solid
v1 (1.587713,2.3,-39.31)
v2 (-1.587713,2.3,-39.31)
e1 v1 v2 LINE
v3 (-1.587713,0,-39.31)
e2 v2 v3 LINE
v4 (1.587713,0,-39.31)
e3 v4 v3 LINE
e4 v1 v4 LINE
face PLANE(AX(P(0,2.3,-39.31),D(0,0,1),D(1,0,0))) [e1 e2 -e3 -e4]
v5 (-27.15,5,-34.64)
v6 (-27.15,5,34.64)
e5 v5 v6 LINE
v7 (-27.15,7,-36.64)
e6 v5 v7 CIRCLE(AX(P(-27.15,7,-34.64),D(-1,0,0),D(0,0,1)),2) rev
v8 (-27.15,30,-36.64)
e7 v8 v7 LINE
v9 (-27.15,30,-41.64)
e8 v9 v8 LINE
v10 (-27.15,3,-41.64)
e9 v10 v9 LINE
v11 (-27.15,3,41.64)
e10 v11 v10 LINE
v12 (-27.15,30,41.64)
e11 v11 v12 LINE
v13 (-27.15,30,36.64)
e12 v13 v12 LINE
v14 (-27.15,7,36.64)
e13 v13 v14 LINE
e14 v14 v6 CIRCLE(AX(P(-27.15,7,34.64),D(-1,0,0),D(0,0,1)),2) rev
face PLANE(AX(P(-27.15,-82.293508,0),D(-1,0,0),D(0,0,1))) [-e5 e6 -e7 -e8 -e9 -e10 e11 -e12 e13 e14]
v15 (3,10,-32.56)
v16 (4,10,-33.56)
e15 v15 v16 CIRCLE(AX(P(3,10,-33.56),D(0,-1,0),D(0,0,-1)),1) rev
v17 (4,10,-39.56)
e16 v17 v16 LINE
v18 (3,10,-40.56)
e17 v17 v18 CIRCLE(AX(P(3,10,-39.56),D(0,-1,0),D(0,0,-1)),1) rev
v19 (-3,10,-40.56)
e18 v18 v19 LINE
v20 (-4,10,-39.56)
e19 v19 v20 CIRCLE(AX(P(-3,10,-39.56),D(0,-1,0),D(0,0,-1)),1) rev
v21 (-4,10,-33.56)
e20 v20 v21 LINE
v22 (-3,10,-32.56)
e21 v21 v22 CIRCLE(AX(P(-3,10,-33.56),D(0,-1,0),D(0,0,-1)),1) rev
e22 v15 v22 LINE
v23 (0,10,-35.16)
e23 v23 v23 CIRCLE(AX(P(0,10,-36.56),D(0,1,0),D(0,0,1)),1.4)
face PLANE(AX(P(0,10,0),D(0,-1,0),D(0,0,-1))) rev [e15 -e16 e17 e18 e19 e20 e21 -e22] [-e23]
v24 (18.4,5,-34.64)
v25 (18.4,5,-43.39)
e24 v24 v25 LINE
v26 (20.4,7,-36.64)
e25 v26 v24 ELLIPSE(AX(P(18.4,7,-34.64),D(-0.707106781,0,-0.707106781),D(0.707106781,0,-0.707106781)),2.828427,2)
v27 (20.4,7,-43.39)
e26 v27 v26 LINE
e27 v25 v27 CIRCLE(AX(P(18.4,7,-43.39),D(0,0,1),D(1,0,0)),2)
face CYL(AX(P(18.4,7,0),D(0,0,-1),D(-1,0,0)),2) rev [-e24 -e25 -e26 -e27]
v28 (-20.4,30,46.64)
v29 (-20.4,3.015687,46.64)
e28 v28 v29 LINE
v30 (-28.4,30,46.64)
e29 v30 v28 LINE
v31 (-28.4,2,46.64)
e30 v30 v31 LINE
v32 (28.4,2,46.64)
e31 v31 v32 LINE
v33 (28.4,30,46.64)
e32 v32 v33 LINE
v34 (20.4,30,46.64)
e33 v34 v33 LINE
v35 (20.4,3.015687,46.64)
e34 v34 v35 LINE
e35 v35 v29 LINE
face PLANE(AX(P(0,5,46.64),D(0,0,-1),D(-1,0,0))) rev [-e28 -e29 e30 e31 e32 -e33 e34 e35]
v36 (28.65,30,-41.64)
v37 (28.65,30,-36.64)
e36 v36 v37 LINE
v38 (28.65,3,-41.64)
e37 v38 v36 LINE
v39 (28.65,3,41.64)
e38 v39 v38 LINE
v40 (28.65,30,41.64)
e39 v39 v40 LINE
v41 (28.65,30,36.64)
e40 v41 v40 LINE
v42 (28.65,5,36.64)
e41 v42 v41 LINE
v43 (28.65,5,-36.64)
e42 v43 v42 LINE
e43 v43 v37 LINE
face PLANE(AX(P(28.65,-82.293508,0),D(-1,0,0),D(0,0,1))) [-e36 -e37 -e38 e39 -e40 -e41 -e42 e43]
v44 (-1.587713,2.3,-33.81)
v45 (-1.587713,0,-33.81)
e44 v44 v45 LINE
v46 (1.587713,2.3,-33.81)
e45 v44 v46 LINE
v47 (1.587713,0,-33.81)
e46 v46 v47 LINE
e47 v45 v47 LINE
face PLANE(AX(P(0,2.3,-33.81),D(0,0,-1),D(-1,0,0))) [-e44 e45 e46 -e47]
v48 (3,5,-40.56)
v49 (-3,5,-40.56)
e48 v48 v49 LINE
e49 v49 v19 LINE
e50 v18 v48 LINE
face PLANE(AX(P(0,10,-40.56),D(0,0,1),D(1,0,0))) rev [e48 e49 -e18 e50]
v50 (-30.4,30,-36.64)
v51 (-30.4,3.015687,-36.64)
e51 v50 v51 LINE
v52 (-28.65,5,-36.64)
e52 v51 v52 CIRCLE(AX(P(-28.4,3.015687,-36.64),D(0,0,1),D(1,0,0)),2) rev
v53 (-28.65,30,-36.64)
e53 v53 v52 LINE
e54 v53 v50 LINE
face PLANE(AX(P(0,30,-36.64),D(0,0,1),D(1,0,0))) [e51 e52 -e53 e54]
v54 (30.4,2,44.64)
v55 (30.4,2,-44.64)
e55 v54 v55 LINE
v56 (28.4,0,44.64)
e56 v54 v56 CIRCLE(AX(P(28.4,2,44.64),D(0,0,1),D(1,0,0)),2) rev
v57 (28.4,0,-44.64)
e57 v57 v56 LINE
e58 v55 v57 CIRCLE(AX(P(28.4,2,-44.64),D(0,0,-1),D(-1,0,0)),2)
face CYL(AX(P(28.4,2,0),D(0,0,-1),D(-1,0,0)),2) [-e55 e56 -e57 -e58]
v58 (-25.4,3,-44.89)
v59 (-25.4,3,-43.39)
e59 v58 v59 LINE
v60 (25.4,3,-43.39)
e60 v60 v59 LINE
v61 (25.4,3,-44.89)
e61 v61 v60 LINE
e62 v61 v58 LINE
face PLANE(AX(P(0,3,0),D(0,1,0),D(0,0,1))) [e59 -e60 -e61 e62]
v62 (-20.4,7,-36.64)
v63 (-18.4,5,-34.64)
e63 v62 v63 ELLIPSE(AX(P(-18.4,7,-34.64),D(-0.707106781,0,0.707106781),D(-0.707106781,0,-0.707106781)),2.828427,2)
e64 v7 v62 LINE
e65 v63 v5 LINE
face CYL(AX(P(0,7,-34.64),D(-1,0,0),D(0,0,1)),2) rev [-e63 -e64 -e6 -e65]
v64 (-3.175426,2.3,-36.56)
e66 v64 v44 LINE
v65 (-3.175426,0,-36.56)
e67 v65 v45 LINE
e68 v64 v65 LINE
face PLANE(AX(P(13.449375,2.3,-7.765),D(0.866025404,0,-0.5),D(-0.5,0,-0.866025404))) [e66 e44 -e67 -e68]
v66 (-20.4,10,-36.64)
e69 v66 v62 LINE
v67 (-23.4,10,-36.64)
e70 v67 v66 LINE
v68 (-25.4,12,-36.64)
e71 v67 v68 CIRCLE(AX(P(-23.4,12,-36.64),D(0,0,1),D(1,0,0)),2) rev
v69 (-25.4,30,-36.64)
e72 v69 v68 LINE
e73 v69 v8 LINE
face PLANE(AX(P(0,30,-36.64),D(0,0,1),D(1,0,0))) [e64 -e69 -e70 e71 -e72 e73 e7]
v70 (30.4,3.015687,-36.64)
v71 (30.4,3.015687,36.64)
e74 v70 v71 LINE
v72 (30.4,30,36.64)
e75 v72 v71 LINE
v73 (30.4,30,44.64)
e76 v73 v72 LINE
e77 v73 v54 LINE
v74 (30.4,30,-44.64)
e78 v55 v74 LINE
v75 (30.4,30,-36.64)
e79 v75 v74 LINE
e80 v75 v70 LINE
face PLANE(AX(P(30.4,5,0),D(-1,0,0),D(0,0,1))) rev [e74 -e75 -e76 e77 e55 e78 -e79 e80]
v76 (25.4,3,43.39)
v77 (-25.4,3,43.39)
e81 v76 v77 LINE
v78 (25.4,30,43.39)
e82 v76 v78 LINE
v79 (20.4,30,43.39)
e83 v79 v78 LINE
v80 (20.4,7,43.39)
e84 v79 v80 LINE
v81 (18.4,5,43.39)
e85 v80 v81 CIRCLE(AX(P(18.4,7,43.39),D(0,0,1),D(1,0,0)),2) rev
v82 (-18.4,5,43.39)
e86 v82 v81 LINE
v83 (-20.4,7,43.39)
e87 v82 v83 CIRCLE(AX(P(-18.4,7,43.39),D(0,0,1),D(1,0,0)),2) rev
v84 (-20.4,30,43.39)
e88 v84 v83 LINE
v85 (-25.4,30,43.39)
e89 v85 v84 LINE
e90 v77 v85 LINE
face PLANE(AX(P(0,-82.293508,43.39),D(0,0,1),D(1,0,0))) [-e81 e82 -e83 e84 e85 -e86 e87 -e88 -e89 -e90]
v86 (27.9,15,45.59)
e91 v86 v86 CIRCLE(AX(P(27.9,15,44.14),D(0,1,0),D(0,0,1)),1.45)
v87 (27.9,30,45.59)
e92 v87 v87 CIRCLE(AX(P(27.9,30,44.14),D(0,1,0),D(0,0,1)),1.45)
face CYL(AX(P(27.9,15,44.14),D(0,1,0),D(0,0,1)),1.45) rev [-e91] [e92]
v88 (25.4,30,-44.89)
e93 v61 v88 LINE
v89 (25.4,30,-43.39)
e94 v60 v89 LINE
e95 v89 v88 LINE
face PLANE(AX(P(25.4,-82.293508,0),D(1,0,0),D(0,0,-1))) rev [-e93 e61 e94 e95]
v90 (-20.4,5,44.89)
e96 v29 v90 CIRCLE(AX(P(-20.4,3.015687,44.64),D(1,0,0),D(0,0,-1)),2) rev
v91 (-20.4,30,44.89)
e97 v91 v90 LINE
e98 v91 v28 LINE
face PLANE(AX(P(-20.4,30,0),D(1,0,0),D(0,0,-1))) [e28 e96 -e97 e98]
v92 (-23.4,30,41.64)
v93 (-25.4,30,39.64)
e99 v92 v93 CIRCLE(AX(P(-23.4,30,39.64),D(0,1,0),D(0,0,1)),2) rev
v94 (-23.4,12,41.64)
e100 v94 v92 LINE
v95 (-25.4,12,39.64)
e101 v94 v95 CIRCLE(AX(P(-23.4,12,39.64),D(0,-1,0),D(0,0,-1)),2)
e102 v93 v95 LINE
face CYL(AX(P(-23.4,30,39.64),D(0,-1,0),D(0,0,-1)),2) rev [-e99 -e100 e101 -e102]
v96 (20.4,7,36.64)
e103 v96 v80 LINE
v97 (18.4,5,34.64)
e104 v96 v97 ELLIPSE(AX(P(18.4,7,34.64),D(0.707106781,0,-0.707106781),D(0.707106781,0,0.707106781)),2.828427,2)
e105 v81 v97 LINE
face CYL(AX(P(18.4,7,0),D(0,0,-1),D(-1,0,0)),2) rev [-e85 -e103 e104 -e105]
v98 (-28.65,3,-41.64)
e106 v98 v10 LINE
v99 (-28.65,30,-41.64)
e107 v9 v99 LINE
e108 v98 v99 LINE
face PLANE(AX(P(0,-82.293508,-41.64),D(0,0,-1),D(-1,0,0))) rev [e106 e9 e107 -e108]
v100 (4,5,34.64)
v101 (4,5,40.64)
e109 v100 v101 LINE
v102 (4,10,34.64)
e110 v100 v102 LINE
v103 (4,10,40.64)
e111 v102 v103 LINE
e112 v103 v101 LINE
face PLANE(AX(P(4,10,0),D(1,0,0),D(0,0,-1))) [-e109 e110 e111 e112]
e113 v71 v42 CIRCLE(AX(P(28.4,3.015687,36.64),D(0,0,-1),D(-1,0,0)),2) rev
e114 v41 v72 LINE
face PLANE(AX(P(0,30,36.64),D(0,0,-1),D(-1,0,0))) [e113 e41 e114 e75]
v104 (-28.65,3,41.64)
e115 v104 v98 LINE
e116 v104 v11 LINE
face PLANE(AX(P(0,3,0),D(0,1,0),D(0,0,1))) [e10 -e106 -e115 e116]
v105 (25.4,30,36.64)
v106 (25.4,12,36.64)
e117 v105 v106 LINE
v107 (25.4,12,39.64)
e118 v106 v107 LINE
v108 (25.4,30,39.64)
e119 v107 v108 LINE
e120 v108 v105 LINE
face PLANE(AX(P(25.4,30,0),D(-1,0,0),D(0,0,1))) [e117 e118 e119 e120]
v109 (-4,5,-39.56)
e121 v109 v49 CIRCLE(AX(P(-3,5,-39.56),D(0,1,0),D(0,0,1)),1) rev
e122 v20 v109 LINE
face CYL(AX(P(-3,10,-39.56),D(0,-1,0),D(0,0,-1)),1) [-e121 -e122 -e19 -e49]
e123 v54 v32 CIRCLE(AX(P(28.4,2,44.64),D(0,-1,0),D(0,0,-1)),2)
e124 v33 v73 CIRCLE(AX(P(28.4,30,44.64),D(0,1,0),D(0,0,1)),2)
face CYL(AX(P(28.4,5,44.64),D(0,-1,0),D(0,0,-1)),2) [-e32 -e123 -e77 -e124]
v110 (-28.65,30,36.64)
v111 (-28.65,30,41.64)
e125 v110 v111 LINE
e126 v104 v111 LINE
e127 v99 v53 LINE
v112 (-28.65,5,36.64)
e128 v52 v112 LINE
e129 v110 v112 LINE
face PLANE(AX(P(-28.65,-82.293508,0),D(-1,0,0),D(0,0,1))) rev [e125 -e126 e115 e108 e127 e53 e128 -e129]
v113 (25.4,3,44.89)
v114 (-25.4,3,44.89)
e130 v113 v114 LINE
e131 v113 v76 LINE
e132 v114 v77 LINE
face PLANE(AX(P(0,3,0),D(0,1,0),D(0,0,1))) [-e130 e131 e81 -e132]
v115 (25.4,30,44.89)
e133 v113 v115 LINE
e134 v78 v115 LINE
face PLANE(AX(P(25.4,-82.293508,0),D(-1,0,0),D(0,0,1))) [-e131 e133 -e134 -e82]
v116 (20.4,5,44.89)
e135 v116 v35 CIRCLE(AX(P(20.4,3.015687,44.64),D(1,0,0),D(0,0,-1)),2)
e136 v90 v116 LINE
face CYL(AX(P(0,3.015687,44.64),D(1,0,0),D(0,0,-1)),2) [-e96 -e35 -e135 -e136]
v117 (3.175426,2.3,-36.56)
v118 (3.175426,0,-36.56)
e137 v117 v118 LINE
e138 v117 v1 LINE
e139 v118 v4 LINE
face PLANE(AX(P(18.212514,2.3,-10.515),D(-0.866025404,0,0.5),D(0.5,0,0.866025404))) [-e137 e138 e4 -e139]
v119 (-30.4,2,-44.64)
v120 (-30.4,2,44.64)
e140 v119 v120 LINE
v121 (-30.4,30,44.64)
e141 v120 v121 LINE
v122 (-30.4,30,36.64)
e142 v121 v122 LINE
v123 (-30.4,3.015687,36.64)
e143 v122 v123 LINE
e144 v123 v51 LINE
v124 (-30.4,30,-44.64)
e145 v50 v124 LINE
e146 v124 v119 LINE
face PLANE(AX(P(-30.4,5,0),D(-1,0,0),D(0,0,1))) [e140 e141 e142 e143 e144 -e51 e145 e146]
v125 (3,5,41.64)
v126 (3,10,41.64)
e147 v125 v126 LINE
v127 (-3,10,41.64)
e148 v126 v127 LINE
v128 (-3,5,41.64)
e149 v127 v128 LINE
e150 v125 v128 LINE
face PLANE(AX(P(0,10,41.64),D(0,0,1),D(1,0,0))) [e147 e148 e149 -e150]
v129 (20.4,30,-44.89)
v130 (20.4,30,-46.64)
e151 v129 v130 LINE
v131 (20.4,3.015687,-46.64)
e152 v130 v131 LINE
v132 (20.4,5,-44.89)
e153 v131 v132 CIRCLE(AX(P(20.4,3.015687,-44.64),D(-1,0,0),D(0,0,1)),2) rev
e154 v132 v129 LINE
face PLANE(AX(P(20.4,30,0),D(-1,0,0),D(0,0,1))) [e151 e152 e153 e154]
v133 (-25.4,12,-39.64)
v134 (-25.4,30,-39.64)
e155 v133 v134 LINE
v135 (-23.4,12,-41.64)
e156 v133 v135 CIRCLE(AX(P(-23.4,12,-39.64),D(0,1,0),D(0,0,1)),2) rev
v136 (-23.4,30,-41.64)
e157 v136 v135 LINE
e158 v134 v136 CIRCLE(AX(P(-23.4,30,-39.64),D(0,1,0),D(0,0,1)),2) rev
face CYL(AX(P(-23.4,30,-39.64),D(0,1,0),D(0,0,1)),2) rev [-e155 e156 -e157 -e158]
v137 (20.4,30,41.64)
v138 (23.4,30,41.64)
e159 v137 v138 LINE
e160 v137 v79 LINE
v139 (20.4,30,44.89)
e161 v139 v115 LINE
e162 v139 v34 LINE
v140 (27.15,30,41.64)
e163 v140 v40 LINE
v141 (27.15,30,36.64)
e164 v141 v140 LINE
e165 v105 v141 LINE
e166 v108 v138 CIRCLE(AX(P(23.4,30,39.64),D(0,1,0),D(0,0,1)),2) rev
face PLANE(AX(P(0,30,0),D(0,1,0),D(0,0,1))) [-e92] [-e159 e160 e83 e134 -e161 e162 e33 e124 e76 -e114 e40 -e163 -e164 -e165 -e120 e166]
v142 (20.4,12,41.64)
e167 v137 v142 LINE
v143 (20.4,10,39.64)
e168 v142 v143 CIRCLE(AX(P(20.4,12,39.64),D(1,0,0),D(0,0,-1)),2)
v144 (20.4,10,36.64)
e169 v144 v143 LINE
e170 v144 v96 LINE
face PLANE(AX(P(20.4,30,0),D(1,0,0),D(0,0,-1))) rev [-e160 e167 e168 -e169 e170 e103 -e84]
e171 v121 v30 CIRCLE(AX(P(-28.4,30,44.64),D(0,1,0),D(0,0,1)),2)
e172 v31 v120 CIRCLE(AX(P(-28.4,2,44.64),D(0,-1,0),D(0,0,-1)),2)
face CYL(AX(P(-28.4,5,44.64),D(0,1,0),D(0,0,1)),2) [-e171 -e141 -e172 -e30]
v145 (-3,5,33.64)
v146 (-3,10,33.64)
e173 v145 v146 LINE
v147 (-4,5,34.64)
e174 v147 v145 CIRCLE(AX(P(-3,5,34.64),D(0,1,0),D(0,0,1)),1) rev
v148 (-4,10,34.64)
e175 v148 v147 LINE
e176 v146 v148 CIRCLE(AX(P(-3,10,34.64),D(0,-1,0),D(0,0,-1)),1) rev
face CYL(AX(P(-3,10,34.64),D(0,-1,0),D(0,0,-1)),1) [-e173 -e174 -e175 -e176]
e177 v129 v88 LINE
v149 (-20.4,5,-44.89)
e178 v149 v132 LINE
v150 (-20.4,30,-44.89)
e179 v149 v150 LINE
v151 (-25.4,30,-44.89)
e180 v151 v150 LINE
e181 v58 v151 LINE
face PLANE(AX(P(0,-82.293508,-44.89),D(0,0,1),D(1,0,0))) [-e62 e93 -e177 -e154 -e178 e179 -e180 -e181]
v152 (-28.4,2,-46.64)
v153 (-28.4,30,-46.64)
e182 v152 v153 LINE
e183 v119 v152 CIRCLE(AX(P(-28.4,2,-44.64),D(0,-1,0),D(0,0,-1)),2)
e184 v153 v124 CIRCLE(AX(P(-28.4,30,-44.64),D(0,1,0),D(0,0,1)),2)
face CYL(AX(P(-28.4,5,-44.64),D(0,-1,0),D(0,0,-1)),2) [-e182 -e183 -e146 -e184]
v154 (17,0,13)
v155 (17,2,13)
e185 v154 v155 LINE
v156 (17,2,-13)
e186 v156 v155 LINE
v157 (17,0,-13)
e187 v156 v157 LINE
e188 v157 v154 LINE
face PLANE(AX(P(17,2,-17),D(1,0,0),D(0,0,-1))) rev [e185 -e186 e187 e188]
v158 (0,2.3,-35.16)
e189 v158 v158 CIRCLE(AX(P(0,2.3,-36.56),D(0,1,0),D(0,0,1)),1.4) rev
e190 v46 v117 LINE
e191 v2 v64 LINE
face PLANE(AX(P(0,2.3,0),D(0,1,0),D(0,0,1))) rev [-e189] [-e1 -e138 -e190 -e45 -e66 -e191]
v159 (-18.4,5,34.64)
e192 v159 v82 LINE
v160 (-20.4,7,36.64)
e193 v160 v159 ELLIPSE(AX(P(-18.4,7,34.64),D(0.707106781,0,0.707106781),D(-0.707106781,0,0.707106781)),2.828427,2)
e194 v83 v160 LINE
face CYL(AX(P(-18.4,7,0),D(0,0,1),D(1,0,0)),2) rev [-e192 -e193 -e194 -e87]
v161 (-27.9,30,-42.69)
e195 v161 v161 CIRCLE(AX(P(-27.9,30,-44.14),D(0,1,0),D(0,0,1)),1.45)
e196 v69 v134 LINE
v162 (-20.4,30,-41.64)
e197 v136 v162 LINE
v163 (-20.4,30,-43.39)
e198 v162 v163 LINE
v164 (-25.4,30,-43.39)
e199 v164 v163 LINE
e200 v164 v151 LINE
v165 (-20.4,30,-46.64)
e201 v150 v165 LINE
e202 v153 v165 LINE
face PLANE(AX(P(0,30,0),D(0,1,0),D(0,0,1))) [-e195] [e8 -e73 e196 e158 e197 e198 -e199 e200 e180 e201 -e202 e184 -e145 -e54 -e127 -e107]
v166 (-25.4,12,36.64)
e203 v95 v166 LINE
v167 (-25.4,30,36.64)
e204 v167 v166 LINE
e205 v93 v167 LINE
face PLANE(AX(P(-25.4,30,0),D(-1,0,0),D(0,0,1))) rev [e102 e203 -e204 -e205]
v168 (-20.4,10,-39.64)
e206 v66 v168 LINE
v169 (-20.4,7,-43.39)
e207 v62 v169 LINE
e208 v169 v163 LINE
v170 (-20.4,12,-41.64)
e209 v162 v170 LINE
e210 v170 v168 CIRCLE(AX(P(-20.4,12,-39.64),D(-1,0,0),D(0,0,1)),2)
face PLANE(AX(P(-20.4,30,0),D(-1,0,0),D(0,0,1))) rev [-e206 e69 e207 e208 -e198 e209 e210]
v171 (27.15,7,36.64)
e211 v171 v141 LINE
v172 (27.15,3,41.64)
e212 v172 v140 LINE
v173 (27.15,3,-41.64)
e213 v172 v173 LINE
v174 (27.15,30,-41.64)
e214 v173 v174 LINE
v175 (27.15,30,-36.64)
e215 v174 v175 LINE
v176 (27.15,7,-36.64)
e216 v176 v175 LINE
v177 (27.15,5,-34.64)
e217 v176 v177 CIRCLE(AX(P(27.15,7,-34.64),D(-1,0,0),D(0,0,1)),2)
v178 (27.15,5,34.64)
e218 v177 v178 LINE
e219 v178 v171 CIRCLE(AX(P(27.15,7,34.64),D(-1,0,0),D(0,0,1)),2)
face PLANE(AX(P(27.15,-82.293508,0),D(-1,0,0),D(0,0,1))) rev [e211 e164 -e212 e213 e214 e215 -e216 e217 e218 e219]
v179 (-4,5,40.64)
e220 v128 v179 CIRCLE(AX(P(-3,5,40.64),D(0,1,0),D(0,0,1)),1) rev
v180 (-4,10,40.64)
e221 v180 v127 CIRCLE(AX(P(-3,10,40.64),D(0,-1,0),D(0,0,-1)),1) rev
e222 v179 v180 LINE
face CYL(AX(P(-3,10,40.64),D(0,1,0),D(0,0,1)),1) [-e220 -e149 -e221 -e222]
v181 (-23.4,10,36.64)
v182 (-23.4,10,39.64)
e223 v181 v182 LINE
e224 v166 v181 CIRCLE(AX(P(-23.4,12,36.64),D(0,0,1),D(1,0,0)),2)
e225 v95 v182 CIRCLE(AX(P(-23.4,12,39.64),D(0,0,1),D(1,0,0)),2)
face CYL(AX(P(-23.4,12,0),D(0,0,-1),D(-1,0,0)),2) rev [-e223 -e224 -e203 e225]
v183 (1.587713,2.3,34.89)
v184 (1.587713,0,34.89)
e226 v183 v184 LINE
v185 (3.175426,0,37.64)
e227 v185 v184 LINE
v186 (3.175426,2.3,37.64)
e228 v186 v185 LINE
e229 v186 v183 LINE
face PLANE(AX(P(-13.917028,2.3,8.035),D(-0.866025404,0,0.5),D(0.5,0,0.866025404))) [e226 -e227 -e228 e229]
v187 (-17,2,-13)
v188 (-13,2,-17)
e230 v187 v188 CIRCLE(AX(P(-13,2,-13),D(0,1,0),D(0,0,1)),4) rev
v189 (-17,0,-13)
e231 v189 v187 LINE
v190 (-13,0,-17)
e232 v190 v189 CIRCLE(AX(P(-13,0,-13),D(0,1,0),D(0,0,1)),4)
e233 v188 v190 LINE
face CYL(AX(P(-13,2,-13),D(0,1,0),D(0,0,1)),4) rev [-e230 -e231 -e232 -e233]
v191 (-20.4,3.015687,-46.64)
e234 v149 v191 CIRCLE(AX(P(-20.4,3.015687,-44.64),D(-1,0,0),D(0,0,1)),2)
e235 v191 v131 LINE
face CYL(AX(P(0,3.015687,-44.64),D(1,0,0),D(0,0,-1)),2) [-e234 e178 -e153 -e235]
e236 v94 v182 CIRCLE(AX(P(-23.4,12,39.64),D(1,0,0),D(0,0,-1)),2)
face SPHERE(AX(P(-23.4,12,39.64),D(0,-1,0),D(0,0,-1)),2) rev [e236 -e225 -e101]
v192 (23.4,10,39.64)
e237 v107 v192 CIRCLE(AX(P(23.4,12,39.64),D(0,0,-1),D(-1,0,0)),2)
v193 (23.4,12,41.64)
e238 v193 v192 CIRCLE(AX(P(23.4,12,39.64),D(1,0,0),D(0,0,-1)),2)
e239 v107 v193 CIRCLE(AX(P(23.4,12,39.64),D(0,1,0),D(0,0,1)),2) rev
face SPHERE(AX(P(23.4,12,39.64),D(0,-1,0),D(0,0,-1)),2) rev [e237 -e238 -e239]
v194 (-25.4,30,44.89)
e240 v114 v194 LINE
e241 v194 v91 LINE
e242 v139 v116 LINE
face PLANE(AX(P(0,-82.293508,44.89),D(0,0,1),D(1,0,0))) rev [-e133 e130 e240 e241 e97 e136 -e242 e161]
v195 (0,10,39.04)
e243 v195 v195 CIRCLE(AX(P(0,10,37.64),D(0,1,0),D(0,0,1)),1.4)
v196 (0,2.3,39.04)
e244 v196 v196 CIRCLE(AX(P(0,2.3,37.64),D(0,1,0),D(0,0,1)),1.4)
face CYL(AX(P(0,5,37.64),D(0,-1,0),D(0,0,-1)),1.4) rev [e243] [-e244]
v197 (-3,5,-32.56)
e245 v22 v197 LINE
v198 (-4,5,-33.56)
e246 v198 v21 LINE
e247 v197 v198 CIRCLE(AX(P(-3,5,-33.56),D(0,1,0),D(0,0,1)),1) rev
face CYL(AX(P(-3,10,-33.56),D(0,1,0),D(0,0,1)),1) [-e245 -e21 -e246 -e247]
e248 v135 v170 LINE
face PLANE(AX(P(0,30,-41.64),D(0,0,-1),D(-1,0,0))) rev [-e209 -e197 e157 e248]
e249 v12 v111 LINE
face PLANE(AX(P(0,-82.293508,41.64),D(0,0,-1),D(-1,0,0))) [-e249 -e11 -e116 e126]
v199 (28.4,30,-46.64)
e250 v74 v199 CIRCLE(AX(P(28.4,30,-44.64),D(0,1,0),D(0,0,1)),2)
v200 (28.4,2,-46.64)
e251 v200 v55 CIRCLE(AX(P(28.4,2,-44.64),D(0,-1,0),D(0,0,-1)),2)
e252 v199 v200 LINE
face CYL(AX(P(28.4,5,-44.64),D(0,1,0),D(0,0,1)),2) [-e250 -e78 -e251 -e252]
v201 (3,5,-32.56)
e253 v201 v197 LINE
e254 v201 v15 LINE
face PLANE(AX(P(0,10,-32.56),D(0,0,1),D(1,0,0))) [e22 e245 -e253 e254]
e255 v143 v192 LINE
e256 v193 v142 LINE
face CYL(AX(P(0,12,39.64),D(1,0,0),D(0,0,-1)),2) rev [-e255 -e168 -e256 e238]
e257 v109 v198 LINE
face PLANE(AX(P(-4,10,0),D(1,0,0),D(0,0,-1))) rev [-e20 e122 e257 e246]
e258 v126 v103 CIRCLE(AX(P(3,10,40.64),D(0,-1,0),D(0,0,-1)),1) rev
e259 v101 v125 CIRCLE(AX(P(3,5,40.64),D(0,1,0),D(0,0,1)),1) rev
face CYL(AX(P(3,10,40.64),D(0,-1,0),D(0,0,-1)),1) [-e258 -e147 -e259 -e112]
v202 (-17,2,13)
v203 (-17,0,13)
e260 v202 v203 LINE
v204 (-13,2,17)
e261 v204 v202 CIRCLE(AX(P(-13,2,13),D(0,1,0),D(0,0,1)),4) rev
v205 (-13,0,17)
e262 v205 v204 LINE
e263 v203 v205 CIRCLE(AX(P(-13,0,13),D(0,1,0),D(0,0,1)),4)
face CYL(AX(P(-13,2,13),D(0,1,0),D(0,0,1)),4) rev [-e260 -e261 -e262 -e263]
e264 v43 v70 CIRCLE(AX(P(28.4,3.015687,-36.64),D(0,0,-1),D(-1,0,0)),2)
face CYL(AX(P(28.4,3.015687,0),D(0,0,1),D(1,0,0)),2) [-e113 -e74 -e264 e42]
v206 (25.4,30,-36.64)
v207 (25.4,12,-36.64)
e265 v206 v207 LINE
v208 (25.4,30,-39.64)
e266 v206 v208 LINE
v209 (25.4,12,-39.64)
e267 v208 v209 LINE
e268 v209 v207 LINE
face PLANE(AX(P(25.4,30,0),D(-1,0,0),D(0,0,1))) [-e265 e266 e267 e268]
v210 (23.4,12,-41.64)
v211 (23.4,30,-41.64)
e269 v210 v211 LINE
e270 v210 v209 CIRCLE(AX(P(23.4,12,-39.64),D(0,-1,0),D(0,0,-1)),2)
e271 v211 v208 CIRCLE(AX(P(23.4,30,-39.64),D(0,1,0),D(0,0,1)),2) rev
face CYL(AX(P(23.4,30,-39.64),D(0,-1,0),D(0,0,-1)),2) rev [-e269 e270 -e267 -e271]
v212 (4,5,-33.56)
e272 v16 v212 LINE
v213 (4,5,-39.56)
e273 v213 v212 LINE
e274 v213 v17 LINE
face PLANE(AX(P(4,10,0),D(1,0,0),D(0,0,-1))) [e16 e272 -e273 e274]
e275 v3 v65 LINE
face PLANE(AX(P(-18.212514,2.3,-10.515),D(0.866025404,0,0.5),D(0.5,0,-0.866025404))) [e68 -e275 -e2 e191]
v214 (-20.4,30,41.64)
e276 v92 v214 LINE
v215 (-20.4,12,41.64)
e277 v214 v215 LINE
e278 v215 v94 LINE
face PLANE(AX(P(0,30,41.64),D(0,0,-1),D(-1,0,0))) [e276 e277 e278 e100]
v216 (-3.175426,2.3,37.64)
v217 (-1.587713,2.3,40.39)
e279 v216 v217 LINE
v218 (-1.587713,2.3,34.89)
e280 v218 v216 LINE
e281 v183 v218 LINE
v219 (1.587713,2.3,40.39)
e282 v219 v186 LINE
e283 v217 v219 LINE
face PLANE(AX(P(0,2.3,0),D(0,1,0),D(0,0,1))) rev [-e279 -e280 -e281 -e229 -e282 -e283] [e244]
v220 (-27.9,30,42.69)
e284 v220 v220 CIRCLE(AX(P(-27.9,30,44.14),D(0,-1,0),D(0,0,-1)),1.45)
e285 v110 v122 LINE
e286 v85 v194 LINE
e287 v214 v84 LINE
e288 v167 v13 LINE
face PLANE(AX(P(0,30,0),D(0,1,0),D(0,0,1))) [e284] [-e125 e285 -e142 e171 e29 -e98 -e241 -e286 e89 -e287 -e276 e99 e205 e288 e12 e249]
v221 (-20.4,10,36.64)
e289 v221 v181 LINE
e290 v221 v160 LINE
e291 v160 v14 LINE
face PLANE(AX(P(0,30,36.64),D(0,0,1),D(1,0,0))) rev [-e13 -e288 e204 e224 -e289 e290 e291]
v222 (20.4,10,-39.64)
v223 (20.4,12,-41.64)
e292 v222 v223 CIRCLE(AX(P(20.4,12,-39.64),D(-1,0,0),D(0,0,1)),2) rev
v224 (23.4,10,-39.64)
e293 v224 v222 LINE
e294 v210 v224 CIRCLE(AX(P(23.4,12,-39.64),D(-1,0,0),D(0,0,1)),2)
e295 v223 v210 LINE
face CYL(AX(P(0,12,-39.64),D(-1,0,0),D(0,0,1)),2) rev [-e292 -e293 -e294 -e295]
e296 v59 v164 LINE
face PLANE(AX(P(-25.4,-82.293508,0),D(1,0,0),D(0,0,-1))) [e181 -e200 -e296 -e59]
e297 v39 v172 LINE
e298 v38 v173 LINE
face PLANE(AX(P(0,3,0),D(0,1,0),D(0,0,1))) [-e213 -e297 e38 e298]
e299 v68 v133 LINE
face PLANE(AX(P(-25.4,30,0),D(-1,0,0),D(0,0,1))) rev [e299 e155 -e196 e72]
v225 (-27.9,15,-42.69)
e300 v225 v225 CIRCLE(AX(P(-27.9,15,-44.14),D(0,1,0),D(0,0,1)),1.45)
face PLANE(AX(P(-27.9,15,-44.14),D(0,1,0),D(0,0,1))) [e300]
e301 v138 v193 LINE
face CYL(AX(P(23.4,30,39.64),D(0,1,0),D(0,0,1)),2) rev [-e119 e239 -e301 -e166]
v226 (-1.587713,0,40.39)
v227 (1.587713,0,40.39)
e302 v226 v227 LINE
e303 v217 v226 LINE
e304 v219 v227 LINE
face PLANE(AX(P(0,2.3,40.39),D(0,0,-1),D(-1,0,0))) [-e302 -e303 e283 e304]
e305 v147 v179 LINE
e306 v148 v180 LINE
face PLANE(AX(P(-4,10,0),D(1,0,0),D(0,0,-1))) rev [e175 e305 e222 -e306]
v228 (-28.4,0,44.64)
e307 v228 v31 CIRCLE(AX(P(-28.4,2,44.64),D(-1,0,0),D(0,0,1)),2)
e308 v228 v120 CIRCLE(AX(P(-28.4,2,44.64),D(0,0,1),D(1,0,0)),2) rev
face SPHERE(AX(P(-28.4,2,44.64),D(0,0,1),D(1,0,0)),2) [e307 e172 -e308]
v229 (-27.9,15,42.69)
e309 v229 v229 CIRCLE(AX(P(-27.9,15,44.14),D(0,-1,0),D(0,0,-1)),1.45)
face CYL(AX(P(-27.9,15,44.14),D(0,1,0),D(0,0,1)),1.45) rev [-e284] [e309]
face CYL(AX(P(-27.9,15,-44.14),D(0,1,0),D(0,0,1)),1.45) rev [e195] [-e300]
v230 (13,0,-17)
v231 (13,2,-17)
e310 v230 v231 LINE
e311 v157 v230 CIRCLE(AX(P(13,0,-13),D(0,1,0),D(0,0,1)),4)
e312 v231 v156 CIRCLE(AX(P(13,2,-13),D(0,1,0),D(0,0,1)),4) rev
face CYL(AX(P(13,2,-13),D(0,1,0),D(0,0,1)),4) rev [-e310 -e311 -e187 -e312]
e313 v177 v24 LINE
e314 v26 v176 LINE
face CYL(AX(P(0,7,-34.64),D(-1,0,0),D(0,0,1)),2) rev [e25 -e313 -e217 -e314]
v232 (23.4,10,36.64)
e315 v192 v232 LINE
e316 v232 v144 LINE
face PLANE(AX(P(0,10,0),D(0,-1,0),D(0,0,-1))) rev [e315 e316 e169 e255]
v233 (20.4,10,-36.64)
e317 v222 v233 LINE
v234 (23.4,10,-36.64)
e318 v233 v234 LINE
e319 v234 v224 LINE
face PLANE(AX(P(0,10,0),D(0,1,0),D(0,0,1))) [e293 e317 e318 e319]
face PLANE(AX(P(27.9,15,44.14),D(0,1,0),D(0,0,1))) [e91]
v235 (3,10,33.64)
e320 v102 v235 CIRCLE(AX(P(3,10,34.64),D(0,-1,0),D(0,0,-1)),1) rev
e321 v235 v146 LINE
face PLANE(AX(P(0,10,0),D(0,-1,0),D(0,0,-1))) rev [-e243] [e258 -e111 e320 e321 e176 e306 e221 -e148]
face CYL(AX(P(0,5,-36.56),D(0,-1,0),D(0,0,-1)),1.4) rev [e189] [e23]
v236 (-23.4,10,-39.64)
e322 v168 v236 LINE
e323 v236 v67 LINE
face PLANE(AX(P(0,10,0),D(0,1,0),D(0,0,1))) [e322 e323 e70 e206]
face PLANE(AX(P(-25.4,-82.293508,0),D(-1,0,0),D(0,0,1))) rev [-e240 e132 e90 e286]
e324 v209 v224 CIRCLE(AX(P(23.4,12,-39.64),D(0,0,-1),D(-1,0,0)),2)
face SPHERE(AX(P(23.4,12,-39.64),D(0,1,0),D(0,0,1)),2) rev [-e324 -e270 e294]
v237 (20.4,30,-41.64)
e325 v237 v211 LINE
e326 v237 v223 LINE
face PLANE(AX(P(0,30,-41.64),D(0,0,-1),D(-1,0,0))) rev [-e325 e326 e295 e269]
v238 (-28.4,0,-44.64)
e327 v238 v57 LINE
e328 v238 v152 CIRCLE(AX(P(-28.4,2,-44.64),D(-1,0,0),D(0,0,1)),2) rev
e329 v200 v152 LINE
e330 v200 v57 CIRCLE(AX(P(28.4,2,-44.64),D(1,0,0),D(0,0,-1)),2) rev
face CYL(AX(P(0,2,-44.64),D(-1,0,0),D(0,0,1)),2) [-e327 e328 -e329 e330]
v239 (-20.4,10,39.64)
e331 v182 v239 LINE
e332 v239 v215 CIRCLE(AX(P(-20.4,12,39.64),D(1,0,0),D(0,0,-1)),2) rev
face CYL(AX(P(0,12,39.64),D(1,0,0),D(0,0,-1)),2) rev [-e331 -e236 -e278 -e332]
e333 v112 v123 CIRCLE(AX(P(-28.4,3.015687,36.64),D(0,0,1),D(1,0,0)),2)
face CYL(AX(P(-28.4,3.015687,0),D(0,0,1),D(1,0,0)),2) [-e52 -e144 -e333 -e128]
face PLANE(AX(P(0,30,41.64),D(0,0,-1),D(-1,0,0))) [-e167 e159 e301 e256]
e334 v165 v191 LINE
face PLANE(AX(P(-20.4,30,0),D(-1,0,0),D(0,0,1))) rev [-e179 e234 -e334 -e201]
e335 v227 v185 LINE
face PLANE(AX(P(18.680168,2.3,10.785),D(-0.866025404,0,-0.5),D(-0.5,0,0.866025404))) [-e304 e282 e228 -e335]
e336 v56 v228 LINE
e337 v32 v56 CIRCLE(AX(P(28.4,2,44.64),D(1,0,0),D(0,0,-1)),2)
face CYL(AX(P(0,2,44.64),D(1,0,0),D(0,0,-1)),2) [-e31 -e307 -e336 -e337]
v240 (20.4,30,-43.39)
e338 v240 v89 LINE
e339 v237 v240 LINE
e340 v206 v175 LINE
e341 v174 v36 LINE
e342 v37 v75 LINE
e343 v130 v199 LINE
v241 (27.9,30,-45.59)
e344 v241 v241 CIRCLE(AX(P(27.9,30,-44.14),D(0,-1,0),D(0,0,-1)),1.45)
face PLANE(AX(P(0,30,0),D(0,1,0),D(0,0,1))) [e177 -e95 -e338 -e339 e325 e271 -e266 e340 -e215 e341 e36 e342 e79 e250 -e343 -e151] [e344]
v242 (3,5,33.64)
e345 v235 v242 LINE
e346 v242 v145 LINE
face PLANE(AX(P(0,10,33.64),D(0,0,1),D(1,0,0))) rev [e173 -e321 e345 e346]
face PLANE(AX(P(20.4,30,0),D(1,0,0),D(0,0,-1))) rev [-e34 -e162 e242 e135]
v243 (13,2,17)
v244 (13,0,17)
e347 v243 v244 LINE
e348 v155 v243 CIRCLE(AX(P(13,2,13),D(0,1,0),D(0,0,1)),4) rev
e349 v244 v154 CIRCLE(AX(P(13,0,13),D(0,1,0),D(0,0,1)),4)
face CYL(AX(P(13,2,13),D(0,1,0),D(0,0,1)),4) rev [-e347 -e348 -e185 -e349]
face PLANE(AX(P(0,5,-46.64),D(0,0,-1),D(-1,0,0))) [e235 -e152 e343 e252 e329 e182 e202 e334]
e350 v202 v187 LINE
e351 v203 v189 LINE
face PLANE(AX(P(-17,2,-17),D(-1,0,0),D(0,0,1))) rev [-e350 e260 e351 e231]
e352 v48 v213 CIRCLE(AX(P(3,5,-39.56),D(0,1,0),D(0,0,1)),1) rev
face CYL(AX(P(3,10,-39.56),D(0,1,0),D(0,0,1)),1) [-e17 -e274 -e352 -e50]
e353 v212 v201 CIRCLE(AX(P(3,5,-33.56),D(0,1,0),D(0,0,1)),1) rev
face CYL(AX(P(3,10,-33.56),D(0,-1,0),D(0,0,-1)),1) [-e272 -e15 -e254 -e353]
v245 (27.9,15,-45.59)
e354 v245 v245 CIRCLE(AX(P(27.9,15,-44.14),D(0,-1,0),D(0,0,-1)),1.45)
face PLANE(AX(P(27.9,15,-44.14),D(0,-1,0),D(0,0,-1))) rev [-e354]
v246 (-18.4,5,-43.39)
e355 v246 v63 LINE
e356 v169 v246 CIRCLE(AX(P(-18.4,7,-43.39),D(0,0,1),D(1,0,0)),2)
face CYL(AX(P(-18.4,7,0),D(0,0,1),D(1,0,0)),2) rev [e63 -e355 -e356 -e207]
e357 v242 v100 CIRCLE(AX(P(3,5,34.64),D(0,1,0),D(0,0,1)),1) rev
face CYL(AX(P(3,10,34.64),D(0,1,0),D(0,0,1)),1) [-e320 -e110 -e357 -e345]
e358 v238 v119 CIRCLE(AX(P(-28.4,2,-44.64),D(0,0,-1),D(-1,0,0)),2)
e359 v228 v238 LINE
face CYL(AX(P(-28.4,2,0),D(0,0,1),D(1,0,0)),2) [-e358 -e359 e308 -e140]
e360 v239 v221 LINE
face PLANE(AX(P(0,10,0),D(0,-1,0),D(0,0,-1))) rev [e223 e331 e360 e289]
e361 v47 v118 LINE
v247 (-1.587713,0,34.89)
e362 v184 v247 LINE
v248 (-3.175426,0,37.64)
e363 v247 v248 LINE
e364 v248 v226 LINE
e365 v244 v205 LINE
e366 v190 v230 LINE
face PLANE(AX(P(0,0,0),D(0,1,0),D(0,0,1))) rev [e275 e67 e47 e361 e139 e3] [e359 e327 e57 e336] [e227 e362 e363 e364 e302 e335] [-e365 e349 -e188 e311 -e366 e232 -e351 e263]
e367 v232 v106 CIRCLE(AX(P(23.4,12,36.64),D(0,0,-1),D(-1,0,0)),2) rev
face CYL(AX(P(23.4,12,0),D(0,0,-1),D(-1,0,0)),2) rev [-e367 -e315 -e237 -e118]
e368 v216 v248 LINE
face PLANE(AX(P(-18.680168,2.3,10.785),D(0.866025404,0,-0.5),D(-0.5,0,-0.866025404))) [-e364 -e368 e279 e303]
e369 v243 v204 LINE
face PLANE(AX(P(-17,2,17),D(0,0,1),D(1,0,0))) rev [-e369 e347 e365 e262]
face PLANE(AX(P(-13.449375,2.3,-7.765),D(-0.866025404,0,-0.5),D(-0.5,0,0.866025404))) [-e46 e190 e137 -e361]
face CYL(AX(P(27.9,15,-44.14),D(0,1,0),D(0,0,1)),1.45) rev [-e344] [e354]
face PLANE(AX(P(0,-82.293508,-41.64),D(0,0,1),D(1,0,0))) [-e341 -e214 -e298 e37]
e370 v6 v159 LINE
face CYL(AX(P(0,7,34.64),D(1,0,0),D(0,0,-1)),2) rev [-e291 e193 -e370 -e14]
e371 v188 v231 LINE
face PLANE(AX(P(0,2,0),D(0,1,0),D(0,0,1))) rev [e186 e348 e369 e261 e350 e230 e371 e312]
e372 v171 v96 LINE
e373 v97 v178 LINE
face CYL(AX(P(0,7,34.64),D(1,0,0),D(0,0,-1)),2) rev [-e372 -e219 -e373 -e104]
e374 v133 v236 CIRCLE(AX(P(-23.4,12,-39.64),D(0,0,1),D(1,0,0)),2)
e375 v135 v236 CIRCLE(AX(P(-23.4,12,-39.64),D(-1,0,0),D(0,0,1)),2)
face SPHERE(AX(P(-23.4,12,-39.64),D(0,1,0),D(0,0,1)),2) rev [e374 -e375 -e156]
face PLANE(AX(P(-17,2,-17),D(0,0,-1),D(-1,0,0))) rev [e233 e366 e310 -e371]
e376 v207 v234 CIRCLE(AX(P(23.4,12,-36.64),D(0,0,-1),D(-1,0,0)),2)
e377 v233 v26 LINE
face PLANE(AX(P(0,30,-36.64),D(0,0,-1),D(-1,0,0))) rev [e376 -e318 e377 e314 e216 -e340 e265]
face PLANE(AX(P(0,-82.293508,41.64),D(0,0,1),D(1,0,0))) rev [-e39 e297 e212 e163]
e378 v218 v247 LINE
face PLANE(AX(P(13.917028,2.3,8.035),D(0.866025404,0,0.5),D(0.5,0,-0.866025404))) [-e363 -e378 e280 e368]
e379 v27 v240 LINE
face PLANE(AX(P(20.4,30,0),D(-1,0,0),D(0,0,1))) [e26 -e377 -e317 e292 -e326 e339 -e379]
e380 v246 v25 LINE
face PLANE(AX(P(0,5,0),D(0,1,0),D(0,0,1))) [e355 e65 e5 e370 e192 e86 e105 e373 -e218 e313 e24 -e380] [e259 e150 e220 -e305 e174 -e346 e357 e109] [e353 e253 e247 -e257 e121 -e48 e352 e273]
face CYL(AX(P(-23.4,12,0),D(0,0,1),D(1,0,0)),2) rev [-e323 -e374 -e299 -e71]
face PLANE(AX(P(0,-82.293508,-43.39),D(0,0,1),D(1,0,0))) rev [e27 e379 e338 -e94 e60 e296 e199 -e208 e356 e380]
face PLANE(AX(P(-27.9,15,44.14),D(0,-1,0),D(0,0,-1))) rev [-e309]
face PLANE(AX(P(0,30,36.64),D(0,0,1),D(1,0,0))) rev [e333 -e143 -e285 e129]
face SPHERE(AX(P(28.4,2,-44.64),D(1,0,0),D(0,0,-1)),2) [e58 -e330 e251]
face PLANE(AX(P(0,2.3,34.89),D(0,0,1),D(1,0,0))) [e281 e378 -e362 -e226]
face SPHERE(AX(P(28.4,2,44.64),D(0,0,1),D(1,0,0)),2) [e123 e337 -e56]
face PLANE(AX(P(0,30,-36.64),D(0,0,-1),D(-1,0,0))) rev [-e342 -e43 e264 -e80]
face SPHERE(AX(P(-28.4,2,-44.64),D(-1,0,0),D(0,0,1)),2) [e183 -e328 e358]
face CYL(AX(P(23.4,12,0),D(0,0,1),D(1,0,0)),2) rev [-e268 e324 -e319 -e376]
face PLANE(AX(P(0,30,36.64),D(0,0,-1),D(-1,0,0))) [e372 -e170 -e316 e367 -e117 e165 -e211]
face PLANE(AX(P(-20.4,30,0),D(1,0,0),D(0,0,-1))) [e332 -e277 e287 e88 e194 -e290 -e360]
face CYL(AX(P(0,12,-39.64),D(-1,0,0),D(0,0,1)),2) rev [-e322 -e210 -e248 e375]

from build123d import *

# Parameters (mm, degrees)
SKETCH1_W           = 60.8
SKETCH1_H           = 93.28
SKETCH1_R           = 1.4
BOSS_EXTRUDE1_DEPTH = 5
BOSS_EXTRUDE3_DEPTH = 30
BOSS_EXTRUDE4_START = 5
SKETCH1_6_W         = 8
SKETCH1_6_H         = 8
SKETCH1_6_R         = 1.4
BOSS_EXTRUDE4_DEPTH = 5
SKETCH1_8_R         = 1.4
CUT_EXTRUDE4_DEPTH  = 2.3
SKETCH4_W           = 5
SKETCH4_H           = 5
BOSS_EXTRUDE5_DEPTH = 5
SKETCH2_W           = 1.5
SKETCH2_H           = 83.28
SKETCH2_W_2         = 50.8
SKETCH2_H_2         = 1.5
SKETCH2_H_3         = 78.28
SKETCH2_W_3         = 45.8
SKETCH2_W_4         = 5
SKETCH2_H_4         = 5
CUT_EXTRUDE1_DEPTH  = 27
SKETCH2_3_R         = 1.45
CUT_EXTRUDE2_DEPTH  = 15
SKETCH3_W           = 34
SKETCH3_H           = 34
CUT_EXTRUDE3_DEPTH  = 2
FILLET1_R           = 2
FILLET3_R           = 1
FILLET5_R           = 4
FILLET6_R           = 2


with BuildPart() as part:
    # Sketch1 → Boss-Extrude1 (new body)
    with BuildSketch(Plane(origin=(0, 0, 0), x_dir=(1, 0, 0), z_dir=(0, 1, 0))):
        Rectangle(SKETCH1_W, SKETCH1_H)
        with Locations(Location((0, -37.64, 0), (0, 0, 270))):
            Circle(SKETCH1_R, mode=Mode.SUBTRACT)
        with Locations(Location((0, 36.56, 0), (0, 0, 270))):
            Circle(SKETCH1_R, mode=Mode.SUBTRACT)
    extrude(amount=BOSS_EXTRUDE1_DEPTH)

    # Sketch1<4> → Boss-Extrude3 (add)
    with BuildSketch(Plane(origin=(0, 0, 0), x_dir=(1, 0, 0), z_dir=(0, 1, 0))):
        Polygon((-20.4, 41.64), (-20.4, 46.64), (-30.4, 46.64), (-30.4, 36.64), (-25.4, 36.64), (-25.4, 41.64), align=None)
        Polygon((25.4, 36.64), (30.4, 36.64), (30.4, 46.64), (20.4, 46.64), (20.4, 41.64), (25.4, 41.64), align=None)
        Polygon((20.4, -46.64), (30.4, -46.64), (30.4, -36.64), (25.4, -36.64), (25.4, -41.64), (20.4, -41.64), align=None)
        Polygon((-30.4, -46.64), (-20.4, -46.64), (-20.4, -41.64), (-25.4, -41.64), (-25.4, -36.64), (-30.4, -36.64), align=None)
    extrude(amount=BOSS_EXTRUDE3_DEPTH)

    # Sketch1<6> → Boss-Extrude4 (add)
    # profile 1 of 2: a face of its own
    with BuildSketch(Plane(origin=(0, 0, 0), x_dir=(1, 0, 0), z_dir=(0, 1, 0)).offset(BOSS_EXTRUDE4_START)):
        with Locations((0, -37.64)):
            Rectangle(SKETCH1_6_W, SKETCH1_6_H)
        with Locations(Location((0, -37.64, 0), (0, 0, 270))):
            Circle(SKETCH1_6_R, mode=Mode.SUBTRACT)
    # profile 2 of 2: a face of its own
    with BuildSketch(Plane(origin=(0, 0, 0), x_dir=(1, 0, 0), z_dir=(0, 1, 0)).offset(BOSS_EXTRUDE4_START)):
        with Locations((0, 36.56)):
            Rectangle(SKETCH1_6_W, SKETCH1_6_H)
        with Locations(Location((0, 36.56, 0), (0, 0, 270))):
            Circle(SKETCH1_6_R, mode=Mode.SUBTRACT)
    extrude(amount=BOSS_EXTRUDE4_DEPTH)

    # Sketch1<8> → Cut-Extrude4 (cut)
    # profile 1 of 2: a face of its own
    with BuildSketch(Plane(origin=(0, 0, 0), x_dir=(1, 0, 0), z_dir=(0, 1, 0))):
        Polygon((-1.58771324, -40.39), (1.58771324, -40.39), (3.175426481, -37.64), (1.58771324, -34.89), (-1.58771324, -34.89), (-3.175426481, -37.64), align=None)
        with Locations(Location((0, -37.64, 0), (0, 0, 270))):
            Circle(SKETCH1_8_R, mode=Mode.SUBTRACT)
    # profile 2 of 2: a face of its own
    with BuildSketch(Plane(origin=(0, 0, 0), x_dir=(1, 0, 0), z_dir=(0, 1, 0))):
        Polygon((-1.58771324, 33.81), (1.58771324, 33.81), (3.175426481, 36.56), (1.58771324, 39.31), (-1.58771324, 39.31), (-3.175426481, 36.56), align=None)
        with Locations(Location((0, 36.56, 0), (0, 0, 270))):
            Circle(SKETCH1_8_R, mode=Mode.SUBTRACT)
    extrude(amount=CUT_EXTRUDE4_DEPTH, mode=Mode.SUBTRACT)

    # Sketch4 → Boss-Extrude5 (add)
    with BuildSketch(Plane(origin=(0, 5, 0), x_dir=(1, 0, 0), z_dir=(0, 1, 0))):
        with Locations((-22.9, -39.14)):
            Rectangle(SKETCH4_W, SKETCH4_H)
        with Locations((-22.9, 39.14)):
            Rectangle(SKETCH4_W, SKETCH4_H)
        with Locations((22.9, 39.14)):
            Rectangle(SKETCH4_W, SKETCH4_H)
        with Locations((22.9, -39.14)):
            Rectangle(SKETCH4_W, SKETCH4_H)
    extrude(amount=BOSS_EXTRUDE5_DEPTH)

    # Sketch2 → Cut-Extrude1 (cut)
    with BuildSketch(Plane(origin=(0, 30, 0), x_dir=(1, 0, 0), z_dir=(0, 1, 0))):
        with Locations((27.9, 0)):
            Rectangle(SKETCH2_W, SKETCH2_H)
        with Locations((0, -44.14)):
            Rectangle(SKETCH2_W_2, SKETCH2_H_2)
        with Locations((-27.9, -2.5)):
            Rectangle(SKETCH2_W, SKETCH2_H_3)
        with Locations((2.5, 44.14)):
            Rectangle(SKETCH2_W_3, SKETCH2_H_2)
        with Locations((-22.9, 44.14)):
            Rectangle(SKETCH2_W_4, SKETCH2_H_2)
        with Locations((-27.9, 39.14)):
            Rectangle(SKETCH2_W, SKETCH2_H_4)
    extrude(amount=-CUT_EXTRUDE1_DEPTH, mode=Mode.SUBTRACT)

    # Sketch2<3> → Cut-Extrude2 (cut)
    with BuildSketch(Plane(origin=(0, 30, 0), x_dir=(1, 0, 0), z_dir=(0, 1, 0))):
        with Locations(Location((27.9, -44.14, 0), (0, 0, 270))):
            Circle(SKETCH2_3_R)
        with Locations(Location((-27.9, -44.14, 0), (0, 0, 90))):
            Circle(SKETCH2_3_R)
        with Locations(Location((-27.9, 44.14, 0), (0, 0, 270))):
            Circle(SKETCH2_3_R)
        with Locations(Location((27.9, 44.14, 0), (0, 0, 90))):
            Circle(SKETCH2_3_R)
    extrude(amount=-CUT_EXTRUDE2_DEPTH, mode=Mode.SUBTRACT)

    # Sketch3 → Cut-Extrude3 (cut)
    with BuildSketch(Plane.XZ):
        Rectangle(SKETCH3_W, SKETCH3_H)
    extrude(amount=-CUT_EXTRUDE3_DEPTH, mode=Mode.SUBTRACT)

    # Fillet1
    # the kernel refuses this fillet: 2 mm, written as the material it adds along each edge
    with BuildSketch(Plane(origin=(-25.4, 5, 41.64), x_dir=(0, 0, -1), z_dir=(0, 1, 0)), Plane(origin=(-25.4, 5, -41.64), x_dir=(1, 0, 0), z_dir=(0, 1, 0)), Plane(origin=(25.4, 5, 41.64), x_dir=(-1, 0, 0), z_dir=(0, 1, 0)), Plane(origin=(25.4, 5, -41.64), x_dir=(0, 0, 1), z_dir=(0, 1, 0))) as fillet1_piece_1:
        with BuildLine():
            CenterArc((FILLET1_R, -FILLET1_R), FILLET1_R, 90, 90)
            Line((0, -FILLET1_R), (0, 0))
            Line((0, 0), (FILLET1_R, 0))
        make_face()
    extrude(amount=25)
    # the kernel refuses this fillet: 2 mm, written as the material it takes off along each edge
    with BuildSketch(Plane(origin=(28.4, 2, 44.64), x_dir=(0, -1, 0), z_dir=(1, 0, 0))) as fillet1_2_piece_1_section:
        Polygon((0, 0), (FILLET1_R * 1.02, 0), (FILLET1_R * 1.02, -FILLET1_R * 1.02), (0, -FILLET1_R * 1.02), align=None)
    fillet1_2_piece_1 = extrude(amount=FILLET1_R * 1.02, mode=Mode.PRIVATE)
    fillet1_2_piece_1 = fillet1_2_piece_1 - Plane(origin=(28.4, 2, 44.64), x_dir=(0, 0.7071067811865475, -0.7071067811865475), z_dir=(1, 0, 0)) * Sphere(FILLET1_R, mode=Mode.PRIVATE)
    add(fillet1_2_piece_1, mode=Mode.SUBTRACT)
    with BuildSketch(Plane(origin=(-28.4, 2, 44.64), x_dir=(0, 0, 1), z_dir=(-1, 0, 0))) as fillet1_2_piece_2_section:
        Polygon((0, 0), (FILLET1_R * 1.02, 0), (FILLET1_R * 1.02, -FILLET1_R * 1.02), (0, -FILLET1_R * 1.02), align=None)
    fillet1_2_piece_2 = extrude(amount=FILLET1_R * 1.02, mode=Mode.PRIVATE)
    fillet1_2_piece_2 = fillet1_2_piece_2 - Plane(origin=(-28.4, 2, 44.64), x_dir=(0, 0.7071067811865475, -0.7071067811865475), z_dir=(-1, 0, 0)) * Sphere(FILLET1_R, mode=Mode.PRIVATE)
    add(fillet1_2_piece_2, mode=Mode.SUBTRACT)
    with BuildSketch(Plane(origin=(-28.4, 2, -44.64), x_dir=(-1, 0, 0), z_dir=(0, 0, -1))) as fillet1_2_piece_3_section:
        Polygon((0, 0), (FILLET1_R * 1.02, 0), (FILLET1_R * 1.02, -FILLET1_R * 1.02), (0, -FILLET1_R * 1.02), align=None)
    fillet1_2_piece_3 = extrude(amount=FILLET1_R * 1.02, mode=Mode.PRIVATE)
    fillet1_2_piece_3 = fillet1_2_piece_3 - Plane(origin=(-28.4, 2, -44.64), x_dir=(0.7071067811865475, 0.7071067811865475, 0), z_dir=(0, 0, -1)) * Sphere(FILLET1_R, mode=Mode.PRIVATE)
    add(fillet1_2_piece_3, mode=Mode.SUBTRACT)
    with BuildSketch(Plane(origin=(28.4, 2, -44.64), x_dir=(0, 0, -1), z_dir=(1, 0, 0))) as fillet1_2_piece_4_section:
        Polygon((0, 0), (FILLET1_R * 1.02, 0), (FILLET1_R * 1.02, -FILLET1_R * 1.02), (0, -FILLET1_R * 1.02), align=None)
    fillet1_2_piece_4 = extrude(amount=FILLET1_R * 1.02, mode=Mode.PRIVATE)
    fillet1_2_piece_4 = fillet1_2_piece_4 - Plane(origin=(28.4, 2, -44.64), x_dir=(0, 0.7071067811865475, 0.7071067811865475), z_dir=(1, 0, 0)) * Sphere(FILLET1_R, mode=Mode.PRIVATE)
    add(fillet1_2_piece_4, mode=Mode.SUBTRACT)
    with BuildSketch(Plane(origin=(20.4, 5, -46.64), x_dir=(0, -1, 0), z_dir=(-1, 0, 0)), Plane(origin=(-20.4, 5, 46.64), x_dir=(0, -1, 0), z_dir=(1, 0, 0))) as fillet1_2_piece_5:
        with BuildLine():
            CenterArc((1.984313483, 2), FILLET1_R, 187.180755781, 82.819244219)
            Line((0, 1.75), (0, 0))
            Line((0, 0), (1.984313483, 0))
        make_face()
    extrude(amount=40.8, mode=Mode.SUBTRACT)
    with BuildSketch(Plane(origin=(30.4, 5, 36.64), x_dir=(0, -1, 0), z_dir=(0, 0, -1)), Plane(origin=(-30.4, 5, -36.64), x_dir=(0, -1, 0), z_dir=(0, 0, 1))) as fillet1_2_piece_6:
        with BuildLine():
            CenterArc((1.984313483, 2), FILLET1_R, 187.180755781, 82.819244219)
            Line((0, 1.75), (0, 0))
            Line((0, 0), (1.984313483, 0))
        make_face()
    extrude(amount=73.28, mode=Mode.SUBTRACT)
    with BuildSketch(Plane(origin=(30.4, 35, 46.64), x_dir=(0, 0, -1), z_dir=(0, -1, 0)), Plane(origin=(-30.4, 35, 46.64), x_dir=(1, 0, 0), z_dir=(0, -1, 0)), Plane(origin=(30.4, 2, -46.64), x_dir=(0, 0, 1), z_dir=(0, 1, 0))) as fillet1_2_piece_7:
        with BuildLine():
            CenterArc((FILLET1_R, -FILLET1_R), FILLET1_R, 90, 90)
            Line((0, -FILLET1_R), (0, 0))
            Line((0, 0), (FILLET1_R, 0))
        make_face()
    extrude(amount=33, mode=Mode.SUBTRACT)
    with BuildSketch(Plane(origin=(-30.4, 35, -46.64), x_dir=(1, 0, 0), z_dir=(0, -1, 0))) as fillet1_2_piece_8:
        with BuildLine():
            CenterArc((FILLET1_R, FILLET1_R), FILLET1_R, 180, 90)
            Line((0, FILLET1_R), (0, 0))
            Line((0, 0), (FILLET1_R, 0))
        make_face()
    extrude(amount=33, mode=Mode.SUBTRACT)
    with BuildSketch(Plane(origin=(-28.4, 0, -46.64), x_dir=(0, 0, 1), z_dir=(1, 0, 0)), Plane(origin=(28.4, 0, 46.64), x_dir=(0, 0, -1), z_dir=(-1, 0, 0))) as fillet1_2_piece_9:
        with BuildLine():
            CenterArc((FILLET1_R, -FILLET1_R), FILLET1_R, 90, 90)
            Line((0, -FILLET1_R), (0, 0))
            Line((0, 0), (FILLET1_R, 0))
        make_face()
    extrude(amount=56.8, mode=Mode.SUBTRACT)
    with BuildSketch(Plane(origin=(-30.4, 0, 44.64), x_dir=(1, 0, 0), z_dir=(0, 0, -1)), Plane(origin=(30.4, 0, 44.64), x_dir=(0, 1, 0), z_dir=(0, 0, -1))) as fillet1_2_piece_10:
        with BuildLine():
            CenterArc((FILLET1_R, -FILLET1_R), FILLET1_R, 90, 90)
            Line((0, -FILLET1_R), (0, 0))
            Line((0, 0), (FILLET1_R, 0))
        make_face()
    extrude(amount=89.28, mode=Mode.SUBTRACT)

    # Fillet3
    fillet3_edges = [part.edges().sort_by_distance(p)[0] for p in [
        (-4, 7.5, 33.64),
        (-4, 7.5, 41.64),
        (4, 7.5, 41.64),
        (4, 7.5, 33.64),
        (-4, 7.5, -40.56),
        (-4, 7.5, -32.56),
        (4, 7.5, -32.56),
        (4, 7.5, -40.56),
    ]]
    fillet(fillet3_edges, radius=FILLET3_R)

    # Fillet5
    fillet5_edges = [part.edges().sort_by_distance(p)[0] for p in [
        (17, 1, 17),
        (17, 1, -17),
        (-17, 1, -17),
        (-17, 1, 17),
    ]]
    fillet(fillet5_edges, radius=FILLET5_R)

    # Fillet6
    fillet6_edges = [part.edges().sort_by_distance(p)[0] for p in [
        (-25.4, 10, 38.14),
        (-21.9, 10, -41.64),
        (25.4, 10, -38.14),
        (21.9, 10, 41.64),
        (-20.4, 5, 40.015),
        (-23.775, 5, 36.64),
        (23.775, 5, 36.64),
        (20.4, 5, 40.015),
        (23.775, 5, -36.64),
        (20.4, 5, -40.015),
        (-20.4, 5, -40.015),
        (-23.775, 5, -36.64),
        (-21.9, 10, 41.64),
        (-24.814213562, 10, 41.054213562),
        (-25.4, 10, -38.14),
        (-24.814213562, 10, -41.054213562),
        (25.4, 10, 38.14),
        (24.814213562, 10, 41.054213562),
        (21.9, 10, -41.64),
        (24.814213562, 10, -41.054213562),
    ]]
    fillet(fillet6_edges, radius=FILLET6_R)


solid = part.part
